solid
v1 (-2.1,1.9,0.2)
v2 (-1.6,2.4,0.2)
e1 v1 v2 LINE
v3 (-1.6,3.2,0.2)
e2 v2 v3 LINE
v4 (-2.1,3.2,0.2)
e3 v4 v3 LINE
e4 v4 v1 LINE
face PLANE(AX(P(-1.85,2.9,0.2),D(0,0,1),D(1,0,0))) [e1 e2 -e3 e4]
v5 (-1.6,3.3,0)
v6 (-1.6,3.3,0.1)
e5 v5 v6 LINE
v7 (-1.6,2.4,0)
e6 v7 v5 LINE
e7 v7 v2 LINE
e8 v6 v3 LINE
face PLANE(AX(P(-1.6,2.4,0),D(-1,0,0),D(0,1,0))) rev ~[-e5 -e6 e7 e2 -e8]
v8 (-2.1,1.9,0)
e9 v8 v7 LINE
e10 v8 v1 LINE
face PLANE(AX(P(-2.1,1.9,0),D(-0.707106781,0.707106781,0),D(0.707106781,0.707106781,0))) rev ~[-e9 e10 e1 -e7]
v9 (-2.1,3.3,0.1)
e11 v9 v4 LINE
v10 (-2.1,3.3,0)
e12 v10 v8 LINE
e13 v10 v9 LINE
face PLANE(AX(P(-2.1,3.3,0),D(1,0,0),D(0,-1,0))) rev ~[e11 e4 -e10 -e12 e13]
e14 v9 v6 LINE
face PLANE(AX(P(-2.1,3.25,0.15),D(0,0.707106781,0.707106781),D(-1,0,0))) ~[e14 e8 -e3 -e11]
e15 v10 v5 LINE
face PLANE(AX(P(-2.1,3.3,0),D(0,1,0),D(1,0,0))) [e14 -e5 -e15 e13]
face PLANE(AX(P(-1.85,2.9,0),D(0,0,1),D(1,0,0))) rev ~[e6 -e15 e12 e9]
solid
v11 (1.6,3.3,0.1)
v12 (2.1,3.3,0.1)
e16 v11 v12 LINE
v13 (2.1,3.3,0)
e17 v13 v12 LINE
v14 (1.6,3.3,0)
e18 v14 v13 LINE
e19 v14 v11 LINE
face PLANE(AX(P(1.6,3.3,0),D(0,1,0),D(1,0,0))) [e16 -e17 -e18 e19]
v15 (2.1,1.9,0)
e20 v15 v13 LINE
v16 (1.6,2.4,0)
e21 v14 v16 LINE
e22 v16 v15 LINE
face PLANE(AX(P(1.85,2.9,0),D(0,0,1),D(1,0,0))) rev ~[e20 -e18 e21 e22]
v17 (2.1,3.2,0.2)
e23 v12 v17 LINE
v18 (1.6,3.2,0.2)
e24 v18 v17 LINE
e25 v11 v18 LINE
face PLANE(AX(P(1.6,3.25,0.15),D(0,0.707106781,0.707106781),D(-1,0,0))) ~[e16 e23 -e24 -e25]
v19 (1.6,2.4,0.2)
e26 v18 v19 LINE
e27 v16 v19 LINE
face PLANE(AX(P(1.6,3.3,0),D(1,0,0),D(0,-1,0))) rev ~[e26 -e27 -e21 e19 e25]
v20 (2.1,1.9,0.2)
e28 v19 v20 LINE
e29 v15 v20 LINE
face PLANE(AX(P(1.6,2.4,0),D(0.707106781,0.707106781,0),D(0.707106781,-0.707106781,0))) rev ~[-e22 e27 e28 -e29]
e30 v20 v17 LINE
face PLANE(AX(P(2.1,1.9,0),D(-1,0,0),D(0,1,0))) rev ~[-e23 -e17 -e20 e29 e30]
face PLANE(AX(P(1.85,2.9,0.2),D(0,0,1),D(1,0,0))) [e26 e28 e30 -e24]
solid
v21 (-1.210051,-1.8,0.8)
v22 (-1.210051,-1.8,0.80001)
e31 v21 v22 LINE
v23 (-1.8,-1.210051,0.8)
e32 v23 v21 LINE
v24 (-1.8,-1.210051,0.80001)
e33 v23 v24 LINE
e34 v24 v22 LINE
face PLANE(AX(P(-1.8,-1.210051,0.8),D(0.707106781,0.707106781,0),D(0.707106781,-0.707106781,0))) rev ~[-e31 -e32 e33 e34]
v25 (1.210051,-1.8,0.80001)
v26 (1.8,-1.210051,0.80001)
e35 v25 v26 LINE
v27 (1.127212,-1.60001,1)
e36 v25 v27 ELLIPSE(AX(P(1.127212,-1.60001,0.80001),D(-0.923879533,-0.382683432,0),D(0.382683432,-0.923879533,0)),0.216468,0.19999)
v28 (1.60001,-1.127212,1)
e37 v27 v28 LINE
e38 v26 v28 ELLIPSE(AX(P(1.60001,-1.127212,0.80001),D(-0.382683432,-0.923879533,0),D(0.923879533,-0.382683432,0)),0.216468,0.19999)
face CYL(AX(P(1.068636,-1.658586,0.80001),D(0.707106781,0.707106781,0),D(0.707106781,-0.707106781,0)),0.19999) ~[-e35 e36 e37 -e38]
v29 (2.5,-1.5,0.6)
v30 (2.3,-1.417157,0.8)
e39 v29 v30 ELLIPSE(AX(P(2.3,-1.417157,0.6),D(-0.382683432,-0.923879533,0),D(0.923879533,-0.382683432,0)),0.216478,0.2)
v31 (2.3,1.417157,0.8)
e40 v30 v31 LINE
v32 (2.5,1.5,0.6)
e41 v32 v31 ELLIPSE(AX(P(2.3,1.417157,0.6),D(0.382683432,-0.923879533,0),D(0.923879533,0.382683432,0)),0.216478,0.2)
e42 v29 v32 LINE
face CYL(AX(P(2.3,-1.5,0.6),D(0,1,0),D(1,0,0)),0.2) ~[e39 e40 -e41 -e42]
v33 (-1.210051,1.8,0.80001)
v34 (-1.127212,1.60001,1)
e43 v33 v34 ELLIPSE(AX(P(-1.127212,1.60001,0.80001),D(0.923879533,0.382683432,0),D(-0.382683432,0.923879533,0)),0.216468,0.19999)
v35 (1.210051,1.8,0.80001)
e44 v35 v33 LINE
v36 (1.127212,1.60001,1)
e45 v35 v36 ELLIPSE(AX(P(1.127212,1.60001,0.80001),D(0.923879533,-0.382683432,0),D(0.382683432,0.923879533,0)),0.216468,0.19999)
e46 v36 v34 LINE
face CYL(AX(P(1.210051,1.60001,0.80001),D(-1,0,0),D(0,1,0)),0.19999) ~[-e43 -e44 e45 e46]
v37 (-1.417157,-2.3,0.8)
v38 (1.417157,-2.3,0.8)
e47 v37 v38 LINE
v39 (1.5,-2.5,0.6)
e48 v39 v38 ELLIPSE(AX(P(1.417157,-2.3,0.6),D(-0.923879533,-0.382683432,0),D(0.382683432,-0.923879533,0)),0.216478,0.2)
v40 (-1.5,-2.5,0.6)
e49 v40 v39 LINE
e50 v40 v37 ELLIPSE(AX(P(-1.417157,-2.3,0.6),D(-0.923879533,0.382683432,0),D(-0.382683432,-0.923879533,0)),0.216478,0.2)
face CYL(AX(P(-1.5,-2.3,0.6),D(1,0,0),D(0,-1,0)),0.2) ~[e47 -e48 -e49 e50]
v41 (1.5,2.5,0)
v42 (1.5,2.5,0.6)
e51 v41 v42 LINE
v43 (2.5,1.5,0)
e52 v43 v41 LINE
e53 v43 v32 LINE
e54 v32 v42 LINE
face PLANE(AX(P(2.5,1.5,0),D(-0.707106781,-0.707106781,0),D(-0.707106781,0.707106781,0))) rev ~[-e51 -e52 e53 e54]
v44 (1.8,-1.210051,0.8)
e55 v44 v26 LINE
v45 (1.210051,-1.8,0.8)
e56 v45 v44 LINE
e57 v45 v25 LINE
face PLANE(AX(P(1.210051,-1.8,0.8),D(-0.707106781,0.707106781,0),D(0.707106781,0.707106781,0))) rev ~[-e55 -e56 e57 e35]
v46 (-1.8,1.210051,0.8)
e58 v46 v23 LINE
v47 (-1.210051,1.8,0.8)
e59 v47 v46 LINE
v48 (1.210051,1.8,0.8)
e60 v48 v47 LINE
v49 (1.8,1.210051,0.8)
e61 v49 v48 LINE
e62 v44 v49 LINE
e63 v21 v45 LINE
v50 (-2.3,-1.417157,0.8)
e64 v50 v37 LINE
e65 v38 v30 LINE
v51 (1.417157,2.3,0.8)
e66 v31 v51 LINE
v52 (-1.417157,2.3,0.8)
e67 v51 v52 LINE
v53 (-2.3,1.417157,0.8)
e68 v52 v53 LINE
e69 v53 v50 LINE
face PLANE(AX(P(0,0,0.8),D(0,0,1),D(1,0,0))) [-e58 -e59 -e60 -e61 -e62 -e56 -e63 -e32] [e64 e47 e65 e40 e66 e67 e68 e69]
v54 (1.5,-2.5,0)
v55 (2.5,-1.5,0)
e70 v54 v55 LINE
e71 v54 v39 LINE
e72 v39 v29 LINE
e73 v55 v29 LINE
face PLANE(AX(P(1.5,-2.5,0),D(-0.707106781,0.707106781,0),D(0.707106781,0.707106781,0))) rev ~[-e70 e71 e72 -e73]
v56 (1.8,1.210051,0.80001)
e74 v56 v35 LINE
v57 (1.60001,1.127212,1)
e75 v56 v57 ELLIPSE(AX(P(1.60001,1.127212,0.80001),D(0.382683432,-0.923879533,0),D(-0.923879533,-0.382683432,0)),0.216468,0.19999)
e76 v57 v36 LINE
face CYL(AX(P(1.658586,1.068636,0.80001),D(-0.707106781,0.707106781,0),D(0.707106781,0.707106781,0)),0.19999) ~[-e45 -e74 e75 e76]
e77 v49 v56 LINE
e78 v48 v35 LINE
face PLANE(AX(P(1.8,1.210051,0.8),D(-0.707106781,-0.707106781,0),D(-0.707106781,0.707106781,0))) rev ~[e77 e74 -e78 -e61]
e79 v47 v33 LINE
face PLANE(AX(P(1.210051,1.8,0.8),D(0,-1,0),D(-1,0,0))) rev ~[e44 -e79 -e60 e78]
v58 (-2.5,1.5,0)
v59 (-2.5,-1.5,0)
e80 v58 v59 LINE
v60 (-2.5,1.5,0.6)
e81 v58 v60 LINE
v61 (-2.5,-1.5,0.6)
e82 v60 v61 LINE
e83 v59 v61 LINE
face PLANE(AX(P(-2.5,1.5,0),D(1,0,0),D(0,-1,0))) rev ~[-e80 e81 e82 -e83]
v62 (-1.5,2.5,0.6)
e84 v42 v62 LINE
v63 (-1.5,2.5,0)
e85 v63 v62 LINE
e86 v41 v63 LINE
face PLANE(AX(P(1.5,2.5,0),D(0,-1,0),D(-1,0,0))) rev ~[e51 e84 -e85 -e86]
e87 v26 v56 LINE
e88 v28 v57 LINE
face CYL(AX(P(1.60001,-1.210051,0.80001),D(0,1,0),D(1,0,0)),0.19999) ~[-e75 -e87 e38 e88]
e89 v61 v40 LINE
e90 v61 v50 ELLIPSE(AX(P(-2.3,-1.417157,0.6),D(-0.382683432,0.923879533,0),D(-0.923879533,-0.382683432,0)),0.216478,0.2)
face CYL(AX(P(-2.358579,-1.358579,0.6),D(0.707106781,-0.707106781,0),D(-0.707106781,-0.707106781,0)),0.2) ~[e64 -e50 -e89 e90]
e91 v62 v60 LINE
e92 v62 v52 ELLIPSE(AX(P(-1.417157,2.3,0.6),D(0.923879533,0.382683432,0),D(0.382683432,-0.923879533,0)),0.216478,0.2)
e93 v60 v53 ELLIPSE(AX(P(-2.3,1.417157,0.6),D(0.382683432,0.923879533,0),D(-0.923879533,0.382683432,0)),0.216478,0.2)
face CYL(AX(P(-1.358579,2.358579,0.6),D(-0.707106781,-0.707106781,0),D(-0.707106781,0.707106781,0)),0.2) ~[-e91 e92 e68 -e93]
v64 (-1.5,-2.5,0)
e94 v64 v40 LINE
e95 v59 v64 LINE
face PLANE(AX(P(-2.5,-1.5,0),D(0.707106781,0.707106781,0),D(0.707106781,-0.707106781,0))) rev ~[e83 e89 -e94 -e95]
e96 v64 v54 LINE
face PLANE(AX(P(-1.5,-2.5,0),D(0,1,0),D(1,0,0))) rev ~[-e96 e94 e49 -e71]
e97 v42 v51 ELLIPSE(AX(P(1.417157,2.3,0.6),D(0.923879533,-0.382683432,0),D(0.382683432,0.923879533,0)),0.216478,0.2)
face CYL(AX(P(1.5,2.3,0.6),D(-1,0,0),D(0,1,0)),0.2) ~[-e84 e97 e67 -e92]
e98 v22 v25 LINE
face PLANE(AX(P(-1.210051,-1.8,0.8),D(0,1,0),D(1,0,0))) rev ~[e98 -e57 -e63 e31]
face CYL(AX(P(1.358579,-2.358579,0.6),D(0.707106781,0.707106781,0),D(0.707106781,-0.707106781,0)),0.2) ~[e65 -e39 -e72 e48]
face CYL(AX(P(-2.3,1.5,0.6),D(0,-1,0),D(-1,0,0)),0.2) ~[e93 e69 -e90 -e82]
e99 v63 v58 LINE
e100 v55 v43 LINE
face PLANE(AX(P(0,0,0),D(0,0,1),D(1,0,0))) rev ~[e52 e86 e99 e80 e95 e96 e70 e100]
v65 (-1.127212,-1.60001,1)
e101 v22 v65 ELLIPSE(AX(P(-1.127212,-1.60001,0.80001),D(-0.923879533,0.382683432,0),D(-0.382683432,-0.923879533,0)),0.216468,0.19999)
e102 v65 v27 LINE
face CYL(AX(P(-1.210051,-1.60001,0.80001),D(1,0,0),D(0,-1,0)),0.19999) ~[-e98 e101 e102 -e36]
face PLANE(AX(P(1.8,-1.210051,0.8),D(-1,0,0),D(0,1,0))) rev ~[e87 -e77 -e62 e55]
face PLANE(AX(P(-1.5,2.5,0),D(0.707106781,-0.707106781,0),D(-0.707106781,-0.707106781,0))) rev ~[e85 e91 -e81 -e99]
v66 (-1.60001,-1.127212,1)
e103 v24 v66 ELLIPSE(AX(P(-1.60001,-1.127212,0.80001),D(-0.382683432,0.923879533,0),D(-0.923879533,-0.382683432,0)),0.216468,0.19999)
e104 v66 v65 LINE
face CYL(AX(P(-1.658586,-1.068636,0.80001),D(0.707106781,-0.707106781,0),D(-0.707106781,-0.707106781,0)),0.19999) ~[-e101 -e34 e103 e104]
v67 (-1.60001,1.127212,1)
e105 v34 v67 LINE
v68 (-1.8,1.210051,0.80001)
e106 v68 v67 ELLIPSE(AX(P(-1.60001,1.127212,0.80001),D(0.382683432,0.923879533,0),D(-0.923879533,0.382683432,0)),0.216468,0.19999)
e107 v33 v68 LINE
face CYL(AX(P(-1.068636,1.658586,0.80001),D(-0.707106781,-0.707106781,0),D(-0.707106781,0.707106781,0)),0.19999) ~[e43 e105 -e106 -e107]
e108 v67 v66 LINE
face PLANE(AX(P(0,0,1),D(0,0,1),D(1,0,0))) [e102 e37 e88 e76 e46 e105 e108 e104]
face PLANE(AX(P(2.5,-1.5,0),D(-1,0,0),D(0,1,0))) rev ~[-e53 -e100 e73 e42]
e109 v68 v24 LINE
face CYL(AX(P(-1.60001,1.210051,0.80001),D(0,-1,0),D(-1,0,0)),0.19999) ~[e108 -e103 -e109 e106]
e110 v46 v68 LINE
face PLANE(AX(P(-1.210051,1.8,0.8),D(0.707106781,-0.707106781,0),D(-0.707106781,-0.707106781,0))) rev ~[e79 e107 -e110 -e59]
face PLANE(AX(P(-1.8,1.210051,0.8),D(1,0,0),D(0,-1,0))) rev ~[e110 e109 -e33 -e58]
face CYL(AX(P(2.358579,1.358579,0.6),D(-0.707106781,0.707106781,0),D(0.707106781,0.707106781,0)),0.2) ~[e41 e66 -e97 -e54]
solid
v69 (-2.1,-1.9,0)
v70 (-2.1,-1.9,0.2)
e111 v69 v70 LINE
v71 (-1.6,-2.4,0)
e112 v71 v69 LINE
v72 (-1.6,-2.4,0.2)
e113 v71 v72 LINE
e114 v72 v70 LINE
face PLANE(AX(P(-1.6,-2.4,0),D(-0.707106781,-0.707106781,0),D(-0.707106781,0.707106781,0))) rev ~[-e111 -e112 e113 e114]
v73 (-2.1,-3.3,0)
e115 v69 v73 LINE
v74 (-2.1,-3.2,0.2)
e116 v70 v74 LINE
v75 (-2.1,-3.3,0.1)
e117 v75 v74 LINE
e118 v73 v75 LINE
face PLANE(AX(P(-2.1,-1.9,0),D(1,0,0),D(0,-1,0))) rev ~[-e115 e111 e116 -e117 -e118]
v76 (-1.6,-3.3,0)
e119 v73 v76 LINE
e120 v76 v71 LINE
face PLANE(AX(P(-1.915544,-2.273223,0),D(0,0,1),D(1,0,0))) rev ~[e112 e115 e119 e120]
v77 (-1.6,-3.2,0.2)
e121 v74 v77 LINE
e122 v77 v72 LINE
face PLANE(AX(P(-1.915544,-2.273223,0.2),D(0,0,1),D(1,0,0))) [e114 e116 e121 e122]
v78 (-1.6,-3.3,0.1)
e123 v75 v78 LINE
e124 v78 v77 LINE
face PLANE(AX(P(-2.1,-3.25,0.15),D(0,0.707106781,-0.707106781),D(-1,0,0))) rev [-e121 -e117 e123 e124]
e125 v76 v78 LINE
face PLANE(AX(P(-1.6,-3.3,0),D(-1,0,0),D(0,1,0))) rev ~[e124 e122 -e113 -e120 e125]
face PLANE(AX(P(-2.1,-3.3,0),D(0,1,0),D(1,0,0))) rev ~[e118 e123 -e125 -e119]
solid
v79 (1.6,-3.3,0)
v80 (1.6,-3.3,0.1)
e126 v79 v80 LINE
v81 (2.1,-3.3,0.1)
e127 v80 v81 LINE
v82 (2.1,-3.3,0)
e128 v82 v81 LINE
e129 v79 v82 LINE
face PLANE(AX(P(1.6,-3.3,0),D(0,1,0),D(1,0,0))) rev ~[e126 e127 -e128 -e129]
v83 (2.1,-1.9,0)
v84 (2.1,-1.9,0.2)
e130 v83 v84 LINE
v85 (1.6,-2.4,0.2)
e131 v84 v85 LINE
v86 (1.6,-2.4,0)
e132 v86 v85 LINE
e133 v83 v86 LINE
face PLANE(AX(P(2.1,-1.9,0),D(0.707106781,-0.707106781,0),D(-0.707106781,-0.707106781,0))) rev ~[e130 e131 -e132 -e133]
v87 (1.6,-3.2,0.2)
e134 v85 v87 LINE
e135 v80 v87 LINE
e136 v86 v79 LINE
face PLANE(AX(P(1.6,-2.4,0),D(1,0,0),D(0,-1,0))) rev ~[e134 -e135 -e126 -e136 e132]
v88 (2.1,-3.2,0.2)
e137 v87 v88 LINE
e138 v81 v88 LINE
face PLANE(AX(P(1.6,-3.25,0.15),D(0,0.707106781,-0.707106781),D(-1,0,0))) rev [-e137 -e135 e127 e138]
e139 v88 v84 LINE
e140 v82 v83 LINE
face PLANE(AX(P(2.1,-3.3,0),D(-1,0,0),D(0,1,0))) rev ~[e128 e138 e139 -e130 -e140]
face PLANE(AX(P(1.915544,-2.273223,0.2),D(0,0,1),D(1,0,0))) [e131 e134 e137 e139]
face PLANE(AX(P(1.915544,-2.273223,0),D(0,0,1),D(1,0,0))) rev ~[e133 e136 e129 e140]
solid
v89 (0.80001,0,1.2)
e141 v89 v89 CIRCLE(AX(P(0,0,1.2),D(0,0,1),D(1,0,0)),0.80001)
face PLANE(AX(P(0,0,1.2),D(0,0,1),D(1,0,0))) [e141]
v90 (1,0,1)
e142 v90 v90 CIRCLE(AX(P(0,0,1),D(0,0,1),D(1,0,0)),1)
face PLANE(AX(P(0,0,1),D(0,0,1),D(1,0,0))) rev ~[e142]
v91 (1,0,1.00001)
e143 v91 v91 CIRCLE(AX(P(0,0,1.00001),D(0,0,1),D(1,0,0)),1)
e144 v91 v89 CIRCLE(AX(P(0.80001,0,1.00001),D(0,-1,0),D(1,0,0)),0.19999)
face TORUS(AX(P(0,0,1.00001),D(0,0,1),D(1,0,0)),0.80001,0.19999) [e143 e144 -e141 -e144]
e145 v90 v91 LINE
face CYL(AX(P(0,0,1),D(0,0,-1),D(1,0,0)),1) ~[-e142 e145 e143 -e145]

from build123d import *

# Parameters (mm, degrees)
F1_DEPTH   = 0.8
F0_W       = 0.5
F0_H       = 0.8
F2_DEPTH   = 0.2
F3_R       = 0.2
F5_DEPTH   = 0.2
F6_R       = 0.19999
F7_R       = 1
F8_DEPTH   = 0.2
F9_R       = 0.19999
F10_SIZE   = 0.1
F10_2_SIZE = 0.1
F10_3_SIZE = 0.1
F10_4_SIZE = 0.1


# Not quite as in the source:
# - a fillet or chamfer is up to 0.001 mm smaller than in the source, because OpenCascade refuses the exact size


with BuildPart() as f1:
    # F0 (on Top) → F1 (new body)
    with BuildSketch(Plane.XY):
        Polygon((-2.1, 1.9), (-2.5, 1.5), (-2.5, -1.5), (-2.1, -1.9), (-1.6, -2.4), (-1.5, -2.5), (1.5, -2.5), (1.6, -2.4), (2.1, -1.9), (2.5, -1.5), (2.5, 1.5), (2.1, 1.9), (1.6, 2.4), (1.5, 2.5), (-1.5, 2.5), (-1.6, 2.4), align=None)
    extrude(amount=F1_DEPTH)

    # F3
    f3_edges = [f1.edges().sort_by_distance(p)[0] for p in [
        (-2, 2, 0.8),
        (-2.5, 0, 0.8),
        (-2, -2, 0.8),
        (0, -2.5, 0.8),
        (2, -2, 0.8),
        (2.5, 0, 0.8),
        (2, 2, 0.8),
        (0, 2.5, 0.8),
    ]]
    fillet(f3_edges, radius=F3_R)

    # F4 (on face) → F5 (join)
    with BuildSketch(Plane.XY.offset(0.8)):
        Polygon((1.2100505063, 1.8), (-1.2100505063, 1.8), (-1.8, 1.2100505063), (-1.8, -1.2100505063), (-1.2100505063, -1.8), (1.2100505063, -1.8), (1.8, -1.2100505063), (1.8, 1.2100505063), align=None)
    extrude(amount=F5_DEPTH)

    # F6 (radius 0.2 in the source; OpenCascade refuses exactly that, so slightly less here)
    f6_edges = [f1.edges().sort_by_distance(p)[0] for p in [
        (1.505025, 1.505025, 1),
        (0, 1.8, 1),
        (-1.505025, 1.505025, 1),
        (-1.8, 0, 1),
        (-1.505025, -1.505025, 1),
        (0, -1.8, 1),
        (1.505025, -1.505025, 1),
        (1.8, 0, 1),
    ]]
    fillet(f6_edges, radius=F6_R)


with BuildPart() as f2:
    # F0 (on Top) → F2 (new body)
    with BuildSketch(Plane.XY):
        Polygon((-1.6, -2.4), (-2.1, -1.9), (-2.1, -2.5), (-1.6, -2.5), align=None)
        with Locations((-1.85, -2.9)):
            Rectangle(F0_W, F0_H)
    extrude(amount=F2_DEPTH)

    # F10#4
    f10_4_edges = [f2.edges().sort_by_distance(p)[0] for p in [
        (-1.85, -3.3, 0.2),
    ]]
    chamfer(f10_4_edges, length=F10_4_SIZE)


with BuildPart() as f2b:
    # F0 (on Top) → F2, piece 2 (new body)
    with BuildSketch(Plane.XY):
        with Locations((-1.85, 2.9)):
            Rectangle(F0_W, F0_H)
        Polygon((-1.6, 2.5), (-2.1, 2.5), (-2.1, 1.9), (-1.6, 2.4), align=None)
    extrude(amount=F2_DEPTH)

    # F10
    f10_edges = [f2b.edges().sort_by_distance(p)[0] for p in [
        (-1.85, 3.3, 0.2),
    ]]
    chamfer(f10_edges, length=F10_SIZE)


with BuildPart() as f2c:
    # F0 (on Top) → F2, piece 3 (new body)
    with BuildSketch(Plane.XY):
        with Locations((1.85, 2.9)):
            Rectangle(F0_W, F0_H)
        Polygon((2.1, 2.5), (1.6, 2.5), (1.6, 2.4), (2.1, 1.9), align=None)
    extrude(amount=F2_DEPTH)

    # F10#2
    f10_2_edges = [f2c.edges().sort_by_distance(p)[0] for p in [
        (1.85, 3.3, 0.2),
    ]]
    chamfer(f10_2_edges, length=F10_2_SIZE)


with BuildPart() as f2d:
    # F0 (on Top) → F2, piece 4 (new body)
    with BuildSketch(Plane.XY):
        Polygon((1.6, -2.4), (1.6, -2.5), (2.1, -2.5), (2.1, -1.9), align=None)
        with Locations((1.85, -2.9)):
            Rectangle(F0_W, F0_H)
    extrude(amount=F2_DEPTH)

    # F10#3
    f10_3_edges = [f2d.edges().sort_by_distance(p)[0] for p in [
        (1.85, -3.3, 0.2),
    ]]
    chamfer(f10_3_edges, length=F10_3_SIZE)


with BuildPart() as f8:
    # F7 (on face) → F8 (new body)
    with BuildSketch(Plane.XY.offset(1)):
        Circle(F7_R)
    extrude(amount=F8_DEPTH)

    # F9 (radius 0.2 in the source; OpenCascade refuses exactly that, so slightly less here)
    f9_edges = [f8.edges().sort_by_distance(p)[0] for p in [
        (-1, 0, 1.2),
    ]]
    fillet(f9_edges, radius=F9_R)


solid = Compound([f1.part, f2.part, f2b.part, f2c.part, f2d.part, f8.part])
